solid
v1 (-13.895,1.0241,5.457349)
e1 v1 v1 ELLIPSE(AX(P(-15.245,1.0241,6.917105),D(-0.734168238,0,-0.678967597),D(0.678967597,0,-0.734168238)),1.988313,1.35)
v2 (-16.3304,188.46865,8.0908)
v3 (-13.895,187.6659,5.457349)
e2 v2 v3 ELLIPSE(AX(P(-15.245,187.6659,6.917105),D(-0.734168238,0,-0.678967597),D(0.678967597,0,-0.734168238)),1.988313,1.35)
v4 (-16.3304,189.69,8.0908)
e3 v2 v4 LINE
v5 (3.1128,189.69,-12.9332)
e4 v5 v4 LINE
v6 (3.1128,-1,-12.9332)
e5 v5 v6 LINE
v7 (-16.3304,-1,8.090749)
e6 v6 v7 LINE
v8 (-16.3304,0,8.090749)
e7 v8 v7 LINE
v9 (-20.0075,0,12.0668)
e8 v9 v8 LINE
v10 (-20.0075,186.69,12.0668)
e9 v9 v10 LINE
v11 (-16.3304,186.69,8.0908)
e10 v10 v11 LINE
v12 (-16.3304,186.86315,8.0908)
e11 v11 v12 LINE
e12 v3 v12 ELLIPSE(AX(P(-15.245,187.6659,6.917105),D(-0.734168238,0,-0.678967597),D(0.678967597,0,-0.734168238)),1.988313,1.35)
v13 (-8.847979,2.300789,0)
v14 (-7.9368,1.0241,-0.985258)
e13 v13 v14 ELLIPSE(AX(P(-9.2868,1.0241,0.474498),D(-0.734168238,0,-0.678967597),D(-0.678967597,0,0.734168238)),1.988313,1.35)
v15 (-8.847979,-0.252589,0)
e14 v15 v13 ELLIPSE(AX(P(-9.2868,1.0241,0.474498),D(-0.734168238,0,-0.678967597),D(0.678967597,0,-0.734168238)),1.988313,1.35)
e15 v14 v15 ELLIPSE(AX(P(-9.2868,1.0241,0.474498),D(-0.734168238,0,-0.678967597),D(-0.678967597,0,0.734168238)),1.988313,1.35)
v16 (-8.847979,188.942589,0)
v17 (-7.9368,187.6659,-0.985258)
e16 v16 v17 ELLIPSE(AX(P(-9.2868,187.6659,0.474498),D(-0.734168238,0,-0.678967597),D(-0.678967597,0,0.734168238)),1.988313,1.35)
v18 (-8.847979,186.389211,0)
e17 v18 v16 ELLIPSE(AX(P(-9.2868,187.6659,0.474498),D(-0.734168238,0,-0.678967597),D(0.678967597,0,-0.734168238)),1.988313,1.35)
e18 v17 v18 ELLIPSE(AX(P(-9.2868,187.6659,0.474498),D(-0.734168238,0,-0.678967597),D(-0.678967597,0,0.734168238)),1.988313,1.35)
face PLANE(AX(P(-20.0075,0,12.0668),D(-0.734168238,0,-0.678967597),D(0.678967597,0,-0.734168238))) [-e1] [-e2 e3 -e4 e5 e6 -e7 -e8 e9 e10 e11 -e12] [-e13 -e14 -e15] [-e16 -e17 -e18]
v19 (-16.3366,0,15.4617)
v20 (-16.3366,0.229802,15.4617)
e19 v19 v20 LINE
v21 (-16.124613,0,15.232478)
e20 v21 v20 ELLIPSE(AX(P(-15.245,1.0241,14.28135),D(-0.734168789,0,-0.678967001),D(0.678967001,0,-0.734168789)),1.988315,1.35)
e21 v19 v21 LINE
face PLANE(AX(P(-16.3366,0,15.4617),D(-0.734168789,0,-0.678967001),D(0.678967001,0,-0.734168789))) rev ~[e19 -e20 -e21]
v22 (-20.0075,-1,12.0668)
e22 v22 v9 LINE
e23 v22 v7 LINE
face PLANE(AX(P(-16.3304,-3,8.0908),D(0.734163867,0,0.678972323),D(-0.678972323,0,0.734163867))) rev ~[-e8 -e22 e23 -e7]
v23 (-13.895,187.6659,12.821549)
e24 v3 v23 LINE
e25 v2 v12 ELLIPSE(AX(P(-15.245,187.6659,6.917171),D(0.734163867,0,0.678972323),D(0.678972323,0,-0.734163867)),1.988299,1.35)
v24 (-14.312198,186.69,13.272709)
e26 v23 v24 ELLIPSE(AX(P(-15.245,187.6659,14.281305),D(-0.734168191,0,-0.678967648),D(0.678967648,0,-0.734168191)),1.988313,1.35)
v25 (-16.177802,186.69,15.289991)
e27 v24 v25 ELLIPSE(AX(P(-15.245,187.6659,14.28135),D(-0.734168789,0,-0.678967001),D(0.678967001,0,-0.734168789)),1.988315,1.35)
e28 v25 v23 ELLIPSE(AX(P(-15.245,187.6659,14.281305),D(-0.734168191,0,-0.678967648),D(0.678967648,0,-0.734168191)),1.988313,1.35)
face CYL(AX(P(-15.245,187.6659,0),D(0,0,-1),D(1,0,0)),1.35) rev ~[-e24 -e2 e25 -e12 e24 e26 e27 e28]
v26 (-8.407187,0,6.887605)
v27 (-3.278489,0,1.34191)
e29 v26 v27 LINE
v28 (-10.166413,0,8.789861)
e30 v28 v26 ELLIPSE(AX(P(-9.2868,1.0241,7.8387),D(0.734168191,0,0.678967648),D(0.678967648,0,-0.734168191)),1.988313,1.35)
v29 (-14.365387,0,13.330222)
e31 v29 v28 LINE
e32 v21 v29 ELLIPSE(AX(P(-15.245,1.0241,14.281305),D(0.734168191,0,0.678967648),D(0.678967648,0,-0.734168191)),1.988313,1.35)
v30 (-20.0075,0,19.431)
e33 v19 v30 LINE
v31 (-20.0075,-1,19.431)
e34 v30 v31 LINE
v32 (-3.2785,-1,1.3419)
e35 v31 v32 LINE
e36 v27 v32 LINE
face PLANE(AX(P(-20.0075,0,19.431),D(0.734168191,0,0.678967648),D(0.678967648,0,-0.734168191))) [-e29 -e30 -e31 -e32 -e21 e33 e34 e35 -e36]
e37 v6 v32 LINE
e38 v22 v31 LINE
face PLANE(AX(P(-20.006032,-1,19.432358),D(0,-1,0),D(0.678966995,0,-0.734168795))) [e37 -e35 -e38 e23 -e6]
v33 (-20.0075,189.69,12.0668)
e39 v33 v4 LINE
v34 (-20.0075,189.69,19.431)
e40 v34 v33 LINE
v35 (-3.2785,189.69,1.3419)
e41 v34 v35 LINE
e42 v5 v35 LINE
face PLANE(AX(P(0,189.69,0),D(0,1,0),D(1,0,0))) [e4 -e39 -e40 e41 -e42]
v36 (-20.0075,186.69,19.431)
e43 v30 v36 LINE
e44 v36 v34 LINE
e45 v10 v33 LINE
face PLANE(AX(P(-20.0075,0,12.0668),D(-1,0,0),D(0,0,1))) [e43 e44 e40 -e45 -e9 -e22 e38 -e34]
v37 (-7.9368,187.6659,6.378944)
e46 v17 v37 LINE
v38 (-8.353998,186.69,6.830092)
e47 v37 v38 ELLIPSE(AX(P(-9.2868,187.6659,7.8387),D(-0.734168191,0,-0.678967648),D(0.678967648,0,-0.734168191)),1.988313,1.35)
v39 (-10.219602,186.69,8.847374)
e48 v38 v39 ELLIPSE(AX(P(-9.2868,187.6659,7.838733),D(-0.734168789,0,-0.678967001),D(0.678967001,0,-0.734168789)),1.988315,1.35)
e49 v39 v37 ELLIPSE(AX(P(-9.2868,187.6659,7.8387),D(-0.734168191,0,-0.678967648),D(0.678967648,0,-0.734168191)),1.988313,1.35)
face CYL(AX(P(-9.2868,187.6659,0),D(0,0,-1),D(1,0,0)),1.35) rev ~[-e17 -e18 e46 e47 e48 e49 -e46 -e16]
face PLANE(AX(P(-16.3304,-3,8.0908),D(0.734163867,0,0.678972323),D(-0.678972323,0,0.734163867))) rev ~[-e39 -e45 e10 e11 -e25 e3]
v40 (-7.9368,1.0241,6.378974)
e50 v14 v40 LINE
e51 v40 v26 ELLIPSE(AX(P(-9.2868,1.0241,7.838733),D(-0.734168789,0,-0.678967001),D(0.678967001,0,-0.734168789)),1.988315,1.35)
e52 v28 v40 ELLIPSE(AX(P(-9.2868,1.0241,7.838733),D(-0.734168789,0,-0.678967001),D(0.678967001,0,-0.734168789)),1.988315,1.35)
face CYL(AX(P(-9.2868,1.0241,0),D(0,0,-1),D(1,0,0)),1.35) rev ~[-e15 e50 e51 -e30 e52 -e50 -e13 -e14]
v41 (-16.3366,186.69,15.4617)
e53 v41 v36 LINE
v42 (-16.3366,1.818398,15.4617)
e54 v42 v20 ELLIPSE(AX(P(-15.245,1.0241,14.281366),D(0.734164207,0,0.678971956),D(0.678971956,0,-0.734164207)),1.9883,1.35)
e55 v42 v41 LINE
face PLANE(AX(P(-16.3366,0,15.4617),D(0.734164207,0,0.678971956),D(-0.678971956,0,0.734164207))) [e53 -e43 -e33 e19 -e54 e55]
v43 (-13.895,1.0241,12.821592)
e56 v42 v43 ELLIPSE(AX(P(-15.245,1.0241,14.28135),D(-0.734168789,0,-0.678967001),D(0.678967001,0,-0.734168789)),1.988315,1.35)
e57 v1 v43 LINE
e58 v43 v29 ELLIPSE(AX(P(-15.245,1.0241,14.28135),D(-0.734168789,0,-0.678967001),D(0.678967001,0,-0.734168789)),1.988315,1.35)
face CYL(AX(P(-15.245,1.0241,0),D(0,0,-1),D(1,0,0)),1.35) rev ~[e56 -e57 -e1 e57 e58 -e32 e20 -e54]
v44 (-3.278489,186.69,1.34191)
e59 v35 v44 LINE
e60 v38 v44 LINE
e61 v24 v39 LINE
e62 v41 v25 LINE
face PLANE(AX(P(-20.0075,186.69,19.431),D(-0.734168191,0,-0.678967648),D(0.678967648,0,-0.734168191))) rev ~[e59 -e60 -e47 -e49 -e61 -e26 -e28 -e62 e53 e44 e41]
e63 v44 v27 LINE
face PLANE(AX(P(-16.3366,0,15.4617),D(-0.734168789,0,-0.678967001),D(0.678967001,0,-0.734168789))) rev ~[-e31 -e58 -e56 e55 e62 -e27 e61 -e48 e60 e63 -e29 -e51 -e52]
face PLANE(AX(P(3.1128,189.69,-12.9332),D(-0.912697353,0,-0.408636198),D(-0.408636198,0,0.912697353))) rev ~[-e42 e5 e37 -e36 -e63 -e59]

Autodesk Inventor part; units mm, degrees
ref_plane "YZ Plane" through (0, 0, 0) normal (1, 0, 0) x (0, 1, 0)
ref_plane "XZ Plane" through (0, 0, 0) normal (0, 1, 0) x (-1, 0, 0)
ref_plane "XY Plane" through (0, 0, 0) normal (0, 0, 1) x (1, 0, 0)
sketch "Sketch1" plane through (0, 0, 0) normal (0, 1, 0) x (-1, 0, 0)
  line L0 (20.0075, 12.0668) -> (-3.1128, -12.9332)
  line L1 (-3.1128, -12.9332) -> (20.0075, 12.0668)
  line L2 (-3.1128, -17.9332) -> (-3.1128, -12.9332)
  line L3 (-3.1128, -17.9332) -> (-14.7232, -17.9332)
  line L4 (-3.1128, -17.9332) -> (-3.1128, -12.9332)
  line L5 (-3.1128, -17.9332) -> (-8.918, -17.9332)
  arc A0 (-14.7232, -17.9332) -> (-3.1128, -12.9332) centre (-21.6099, 14.0384) ccw
  line L6 (-14.7232, -17.9332) -> (20.7671, -17.9332)
  line L7 (20.0075, 12.0668) -> (20.0075, -17.9332)
  line L8 (20.0075, 12.0668) -> (20.0075, 17.0668)
  line L9 (16.3366, 15.4617) -> (-8.1128, -10.9755)
  line L10 (16.3366, 15.4617) -> (20.0075, 19.431)
  line L11 (20.0075, 19.431) -> (20.0075, 15.7489)
  line L12 (-14.7232, -17.9332) -> (-8.1128, -10.9755)
  point P0 (0, 0)
  dimension "d0" = 5
  dimension "d1" = 5
extrude "Extrusion1" add sketch "Sketch1" along normal blind 186.69 contours L0 A0 L12 L9 L10 L11 L8
sketch "Sketch2" plane through (0, 0, 0) normal (0, -1, 0) x (1, 0, 0)
  line L0 (3.1128, -12.9332) -> (-20.0075, 12.0668) projected
  line L1 (-20.0075, 12.0668) -> (-16.3304, 12.0668)
  line L2 (-16.3304, 12.0668) -> (-16.3304, -0.4332)
  line L3 (-16.3304, -0.4332) -> (-20.0075, -0.4332)
  line L4 (-20.0075, -0.4332) -> (-20.0075, 12.0668)
  circle A0 centre (-18.1689, 1.5735) radius 1.35
  circle A1 centre (-18.1689, 5.8168) radius 1.35
  point P0 (0, 0)
  point P1 (-16.3304, 8.0908)
  dimension "d4" = 2.7
  dimension "d5" = 2.7
extrude "Extrusion2" add sketch "Sketch2" along normal blind 3 contours L2 L3 L4 L0
sketch "Sketch3" plane through (0, 0, 0) normal (0, -1, 0) x (1, 0, 0)
  line L0 (-20.0075, 12.0668) -> (-20.0075, 19.431) projected
  line L1 (3.1128, -12.9332) -> (-20.0075, 12.0668) projected
  line L2 (-20.0075, 19.431) -> (-20.0075, 12.0668)
  line L3 (-20.0075, 12.0668) -> (3.1128, -12.9332)
  arc A0 (3.1128, -12.9332) -> (14.7232, -17.9332) centre (21.6099, 14.0384) ccw projected
  arc A1 (3.1128, -12.9332) -> (14.6054, -17.9076) centre (21.6099, 14.0384) ccw
  line L4 (8.1128, -10.9755) -> (14.7232, -17.9332) projected
  line L5 (8.1128, -10.9755) -> (14.7232, -17.9332)
  line L6 (-20.0075, 19.431) -> (8.1128, -10.9755)
  point P0 (0, 0)
extrude "Extrusion3" add sketch "Sketch3" along normal blind 3
sketch "Sketch4" plane through (0, 186.69, 0) normal (0, 1, 0) x (1, 0, 0)
  circle A0 centre (-18.1689, -5.8168) radius 1.35 projected
  circle A1 centre (-18.1689, -1.5735) radius 1.35 projected
  line L0 (-20.0075, -19.431) -> (-20.0075, 0.4332) projected
  line L1 (-20.0075, 0.4332) -> (-16.3304, 0.4332) projected
  line L2 (-16.3304, 0.4332) -> (-16.3304, -8.0908) projected
  line L3 (8.1128, 10.9755) -> (14.7232, 17.9332) projected
  line L4 (14.7232, 17.9332) -> (8.1128, 10.9755)
  line L5 (-20.0075, -19.431) -> (8.1128, 10.9755) projected
  line L6 (8.1128, 10.9755) -> (-20.0075, -19.431)
  line L7 (-20.0075, -19.431) -> (-20.0075, 0.4332)
  line L8 (-20.0075, 0.4332) -> (-16.3304, 0.4332) projected
  line L9 (-20.0075, 0.4332) -> (-16.3304, 0.4332)
  line L10 (-16.3304, 0.4332) -> (-16.3304, -8.0908)
  line L11 (3.1128, 12.9332) -> (-20.0075, -12.0668) projected
  line L12 (-16.3304, -8.0908) -> (3.1128, 12.9332)
  arc A2 (14.7232, 17.9332) -> (3.1128, 12.9332) centre (21.6099, -14.0384) ccw
  arc A3 (-20.0075, -12.0668) -> (-20.0075, -10.5639) centre (-20.8201, -11.3154) ccw
  line L13 (-16.3304, 0.4332) -> (-20.0075, 0.4332)
  point P0 (0, 0)
extrude "Extrusion4" add sketch "Sketch4" along normal blind 3
sketch "Sketch5" plane through (0, 189.69, 0) normal (0, 1, 0) x (1, 0, 0)
  line L0 (-16.3304, -8.0908) -> (3.1128, 12.9332) projected
  line L1 (3.1128, 12.9332) -> (3.1128, 4.2571)
  line L2 (3.1128, 4.2571) -> (16.783, 4.2571)
  line L3 (16.783, 4.2571) -> (16.783, 22.684)
  line L4 (16.783, 22.684) -> (3.1128, 22.684)
  line L5 (3.1128, 22.684) -> (3.1128, 12.9332)
  point P0 (0, 0)
extrude "Extrusion5" cut sketch "Sketch5" against normal blind 200
sketch "Sketch6" plane through (0, 189.69, 0) normal (0, 1, 0) x (1, 0, 0)
  line L0 (3.1128, 12.9332) -> (-16.3304, -8.0908) projected
  line L1 (3.1128, 12.9332) -> (-3.2785, -1.3419)
  line L2 (-20.0075, -19.431) -> (3.1128, 5.569) projected
  line L3 (3.1128, 5.569) -> (3.1128, 12.9332) projected
  line L4 (3.1128, 5.569) -> (-3.2785, -1.3419)
  line L5 (3.1128, 5.569) -> (3.1128, 12.9332)
  point P0 (0, 0)
extrude "Extrusion6" cut sketch "Sketch6" against normal blind 200
sketch "Sketch7" plane through (0, -3, 0) normal (0, -1, 0) x (1, 0, 0)
  line L0 (-16.3304, 8.0908) -> (-16.3304, -0.4332) projected
  line L1 (-16.3304, 8.0908) -> (-20.0075, 12.0668) projected
  line L2 (-16.3304, 8.0908) -> (-20.0075, 12.0668)
  line L3 (-20.0075, -0.4332) -> (-20.0075, 19.431) projected
  line L4 (-20.0075, 12.0668) -> (-20.0075, -0.4332)
  line L5 (-16.3304, -0.4332) -> (-20.0075, -0.4332) projected
  line L6 (-20.0075, -0.4332) -> (-16.3304, -0.4332)
  line L7 (-16.3304, -0.4332) -> (-16.3304, 8.0908)
  point P0 (0, 0)
extrude "Extrusion7" cut sketch "Sketch7" against normal blind 222
sketch "Sketch8" plane through (-20.0075, -3, 19.431) normal (0.7341688, 0, 0.678967) x (0.678967, 0, -0.7341688)
  line L0 (0, 0) -> (0, 192.69) projected
  line L1 (0, 192.69) -> (0, 2)
  line L2 (0, 2) -> (41.2163, 2)
  line L3 (41.2163, 2) -> (41.2163, -1.239)
  line L4 (41.2163, -1.239) -> (0, -1.239)
  line L5 (0, -1.239) -> (0, 2)
  point P0 (27.85, 3)
  dimension "d18" = 190.69
extrude "Extrusion8" cut sketch "Sketch8" against normal blind 222
sketch "Sketch9" plane through (0, 0, 0) normal (0, 0, 1) x (1, 0, 0)
  circle A0 centre (-15.245, 1.0241) radius 1.35
  line L0 (-20.0075, -1) -> (-20.0075, 189.69) projected
  line L1 (-20.0075, 94.345) -> (7.4426, 94.345)
  circle A1 centre (-9.2868, 1.0241) radius 1.35
  circle A2 centre (-15.245, 187.6659) radius 1.35
  circle A3 centre (-9.2868, 187.6659) radius 1.35
  point P0 (0, 0)
  dimension "d21" = 2.7
  dimension "d22" = 2.7
extrude "Extrusion9" cut sketch "Sketch9" along normal mid plane 222
sketch "Sketch10" plane through (0, 0, 0) normal (0, 0, 1) x (1, 0, 0)
  circle A0 centre (-15.245, 1.0241) radius 1.35 projected
  circle A1 centre (-15.245, 1.0241) radius 1.35
  circle A2 centre (-9.2868, 1.0241) radius 1.35 projected
  circle A3 centre (-9.2868, 1.0241) radius 1.35
  circle A4 centre (-15.245, 187.6659) radius 1.35 projected
  circle A5 centre (-15.245, 187.6659) radius 1.35
  circle A6 centre (-9.2868, 187.6659) radius 1.35 projected
  circle A7 centre (-9.2868, 187.6659) radius 1.35
  line L0 (-16.595, 1.0241) -> (-20.0075, 1.0241)
  line L1 (-20.0075, -1) -> (-20.0075, 189.69) projected
  line L2 (-20.0075, 1.0241) -> (-20.0075, -1)
  line L3 (-20.0075, -1) -> (-3.2785, -1) projected
  line L4 (-20.0075, -1) -> (-3.2785, -1)
  point P0 (0, 0)
properties part number "blade"
